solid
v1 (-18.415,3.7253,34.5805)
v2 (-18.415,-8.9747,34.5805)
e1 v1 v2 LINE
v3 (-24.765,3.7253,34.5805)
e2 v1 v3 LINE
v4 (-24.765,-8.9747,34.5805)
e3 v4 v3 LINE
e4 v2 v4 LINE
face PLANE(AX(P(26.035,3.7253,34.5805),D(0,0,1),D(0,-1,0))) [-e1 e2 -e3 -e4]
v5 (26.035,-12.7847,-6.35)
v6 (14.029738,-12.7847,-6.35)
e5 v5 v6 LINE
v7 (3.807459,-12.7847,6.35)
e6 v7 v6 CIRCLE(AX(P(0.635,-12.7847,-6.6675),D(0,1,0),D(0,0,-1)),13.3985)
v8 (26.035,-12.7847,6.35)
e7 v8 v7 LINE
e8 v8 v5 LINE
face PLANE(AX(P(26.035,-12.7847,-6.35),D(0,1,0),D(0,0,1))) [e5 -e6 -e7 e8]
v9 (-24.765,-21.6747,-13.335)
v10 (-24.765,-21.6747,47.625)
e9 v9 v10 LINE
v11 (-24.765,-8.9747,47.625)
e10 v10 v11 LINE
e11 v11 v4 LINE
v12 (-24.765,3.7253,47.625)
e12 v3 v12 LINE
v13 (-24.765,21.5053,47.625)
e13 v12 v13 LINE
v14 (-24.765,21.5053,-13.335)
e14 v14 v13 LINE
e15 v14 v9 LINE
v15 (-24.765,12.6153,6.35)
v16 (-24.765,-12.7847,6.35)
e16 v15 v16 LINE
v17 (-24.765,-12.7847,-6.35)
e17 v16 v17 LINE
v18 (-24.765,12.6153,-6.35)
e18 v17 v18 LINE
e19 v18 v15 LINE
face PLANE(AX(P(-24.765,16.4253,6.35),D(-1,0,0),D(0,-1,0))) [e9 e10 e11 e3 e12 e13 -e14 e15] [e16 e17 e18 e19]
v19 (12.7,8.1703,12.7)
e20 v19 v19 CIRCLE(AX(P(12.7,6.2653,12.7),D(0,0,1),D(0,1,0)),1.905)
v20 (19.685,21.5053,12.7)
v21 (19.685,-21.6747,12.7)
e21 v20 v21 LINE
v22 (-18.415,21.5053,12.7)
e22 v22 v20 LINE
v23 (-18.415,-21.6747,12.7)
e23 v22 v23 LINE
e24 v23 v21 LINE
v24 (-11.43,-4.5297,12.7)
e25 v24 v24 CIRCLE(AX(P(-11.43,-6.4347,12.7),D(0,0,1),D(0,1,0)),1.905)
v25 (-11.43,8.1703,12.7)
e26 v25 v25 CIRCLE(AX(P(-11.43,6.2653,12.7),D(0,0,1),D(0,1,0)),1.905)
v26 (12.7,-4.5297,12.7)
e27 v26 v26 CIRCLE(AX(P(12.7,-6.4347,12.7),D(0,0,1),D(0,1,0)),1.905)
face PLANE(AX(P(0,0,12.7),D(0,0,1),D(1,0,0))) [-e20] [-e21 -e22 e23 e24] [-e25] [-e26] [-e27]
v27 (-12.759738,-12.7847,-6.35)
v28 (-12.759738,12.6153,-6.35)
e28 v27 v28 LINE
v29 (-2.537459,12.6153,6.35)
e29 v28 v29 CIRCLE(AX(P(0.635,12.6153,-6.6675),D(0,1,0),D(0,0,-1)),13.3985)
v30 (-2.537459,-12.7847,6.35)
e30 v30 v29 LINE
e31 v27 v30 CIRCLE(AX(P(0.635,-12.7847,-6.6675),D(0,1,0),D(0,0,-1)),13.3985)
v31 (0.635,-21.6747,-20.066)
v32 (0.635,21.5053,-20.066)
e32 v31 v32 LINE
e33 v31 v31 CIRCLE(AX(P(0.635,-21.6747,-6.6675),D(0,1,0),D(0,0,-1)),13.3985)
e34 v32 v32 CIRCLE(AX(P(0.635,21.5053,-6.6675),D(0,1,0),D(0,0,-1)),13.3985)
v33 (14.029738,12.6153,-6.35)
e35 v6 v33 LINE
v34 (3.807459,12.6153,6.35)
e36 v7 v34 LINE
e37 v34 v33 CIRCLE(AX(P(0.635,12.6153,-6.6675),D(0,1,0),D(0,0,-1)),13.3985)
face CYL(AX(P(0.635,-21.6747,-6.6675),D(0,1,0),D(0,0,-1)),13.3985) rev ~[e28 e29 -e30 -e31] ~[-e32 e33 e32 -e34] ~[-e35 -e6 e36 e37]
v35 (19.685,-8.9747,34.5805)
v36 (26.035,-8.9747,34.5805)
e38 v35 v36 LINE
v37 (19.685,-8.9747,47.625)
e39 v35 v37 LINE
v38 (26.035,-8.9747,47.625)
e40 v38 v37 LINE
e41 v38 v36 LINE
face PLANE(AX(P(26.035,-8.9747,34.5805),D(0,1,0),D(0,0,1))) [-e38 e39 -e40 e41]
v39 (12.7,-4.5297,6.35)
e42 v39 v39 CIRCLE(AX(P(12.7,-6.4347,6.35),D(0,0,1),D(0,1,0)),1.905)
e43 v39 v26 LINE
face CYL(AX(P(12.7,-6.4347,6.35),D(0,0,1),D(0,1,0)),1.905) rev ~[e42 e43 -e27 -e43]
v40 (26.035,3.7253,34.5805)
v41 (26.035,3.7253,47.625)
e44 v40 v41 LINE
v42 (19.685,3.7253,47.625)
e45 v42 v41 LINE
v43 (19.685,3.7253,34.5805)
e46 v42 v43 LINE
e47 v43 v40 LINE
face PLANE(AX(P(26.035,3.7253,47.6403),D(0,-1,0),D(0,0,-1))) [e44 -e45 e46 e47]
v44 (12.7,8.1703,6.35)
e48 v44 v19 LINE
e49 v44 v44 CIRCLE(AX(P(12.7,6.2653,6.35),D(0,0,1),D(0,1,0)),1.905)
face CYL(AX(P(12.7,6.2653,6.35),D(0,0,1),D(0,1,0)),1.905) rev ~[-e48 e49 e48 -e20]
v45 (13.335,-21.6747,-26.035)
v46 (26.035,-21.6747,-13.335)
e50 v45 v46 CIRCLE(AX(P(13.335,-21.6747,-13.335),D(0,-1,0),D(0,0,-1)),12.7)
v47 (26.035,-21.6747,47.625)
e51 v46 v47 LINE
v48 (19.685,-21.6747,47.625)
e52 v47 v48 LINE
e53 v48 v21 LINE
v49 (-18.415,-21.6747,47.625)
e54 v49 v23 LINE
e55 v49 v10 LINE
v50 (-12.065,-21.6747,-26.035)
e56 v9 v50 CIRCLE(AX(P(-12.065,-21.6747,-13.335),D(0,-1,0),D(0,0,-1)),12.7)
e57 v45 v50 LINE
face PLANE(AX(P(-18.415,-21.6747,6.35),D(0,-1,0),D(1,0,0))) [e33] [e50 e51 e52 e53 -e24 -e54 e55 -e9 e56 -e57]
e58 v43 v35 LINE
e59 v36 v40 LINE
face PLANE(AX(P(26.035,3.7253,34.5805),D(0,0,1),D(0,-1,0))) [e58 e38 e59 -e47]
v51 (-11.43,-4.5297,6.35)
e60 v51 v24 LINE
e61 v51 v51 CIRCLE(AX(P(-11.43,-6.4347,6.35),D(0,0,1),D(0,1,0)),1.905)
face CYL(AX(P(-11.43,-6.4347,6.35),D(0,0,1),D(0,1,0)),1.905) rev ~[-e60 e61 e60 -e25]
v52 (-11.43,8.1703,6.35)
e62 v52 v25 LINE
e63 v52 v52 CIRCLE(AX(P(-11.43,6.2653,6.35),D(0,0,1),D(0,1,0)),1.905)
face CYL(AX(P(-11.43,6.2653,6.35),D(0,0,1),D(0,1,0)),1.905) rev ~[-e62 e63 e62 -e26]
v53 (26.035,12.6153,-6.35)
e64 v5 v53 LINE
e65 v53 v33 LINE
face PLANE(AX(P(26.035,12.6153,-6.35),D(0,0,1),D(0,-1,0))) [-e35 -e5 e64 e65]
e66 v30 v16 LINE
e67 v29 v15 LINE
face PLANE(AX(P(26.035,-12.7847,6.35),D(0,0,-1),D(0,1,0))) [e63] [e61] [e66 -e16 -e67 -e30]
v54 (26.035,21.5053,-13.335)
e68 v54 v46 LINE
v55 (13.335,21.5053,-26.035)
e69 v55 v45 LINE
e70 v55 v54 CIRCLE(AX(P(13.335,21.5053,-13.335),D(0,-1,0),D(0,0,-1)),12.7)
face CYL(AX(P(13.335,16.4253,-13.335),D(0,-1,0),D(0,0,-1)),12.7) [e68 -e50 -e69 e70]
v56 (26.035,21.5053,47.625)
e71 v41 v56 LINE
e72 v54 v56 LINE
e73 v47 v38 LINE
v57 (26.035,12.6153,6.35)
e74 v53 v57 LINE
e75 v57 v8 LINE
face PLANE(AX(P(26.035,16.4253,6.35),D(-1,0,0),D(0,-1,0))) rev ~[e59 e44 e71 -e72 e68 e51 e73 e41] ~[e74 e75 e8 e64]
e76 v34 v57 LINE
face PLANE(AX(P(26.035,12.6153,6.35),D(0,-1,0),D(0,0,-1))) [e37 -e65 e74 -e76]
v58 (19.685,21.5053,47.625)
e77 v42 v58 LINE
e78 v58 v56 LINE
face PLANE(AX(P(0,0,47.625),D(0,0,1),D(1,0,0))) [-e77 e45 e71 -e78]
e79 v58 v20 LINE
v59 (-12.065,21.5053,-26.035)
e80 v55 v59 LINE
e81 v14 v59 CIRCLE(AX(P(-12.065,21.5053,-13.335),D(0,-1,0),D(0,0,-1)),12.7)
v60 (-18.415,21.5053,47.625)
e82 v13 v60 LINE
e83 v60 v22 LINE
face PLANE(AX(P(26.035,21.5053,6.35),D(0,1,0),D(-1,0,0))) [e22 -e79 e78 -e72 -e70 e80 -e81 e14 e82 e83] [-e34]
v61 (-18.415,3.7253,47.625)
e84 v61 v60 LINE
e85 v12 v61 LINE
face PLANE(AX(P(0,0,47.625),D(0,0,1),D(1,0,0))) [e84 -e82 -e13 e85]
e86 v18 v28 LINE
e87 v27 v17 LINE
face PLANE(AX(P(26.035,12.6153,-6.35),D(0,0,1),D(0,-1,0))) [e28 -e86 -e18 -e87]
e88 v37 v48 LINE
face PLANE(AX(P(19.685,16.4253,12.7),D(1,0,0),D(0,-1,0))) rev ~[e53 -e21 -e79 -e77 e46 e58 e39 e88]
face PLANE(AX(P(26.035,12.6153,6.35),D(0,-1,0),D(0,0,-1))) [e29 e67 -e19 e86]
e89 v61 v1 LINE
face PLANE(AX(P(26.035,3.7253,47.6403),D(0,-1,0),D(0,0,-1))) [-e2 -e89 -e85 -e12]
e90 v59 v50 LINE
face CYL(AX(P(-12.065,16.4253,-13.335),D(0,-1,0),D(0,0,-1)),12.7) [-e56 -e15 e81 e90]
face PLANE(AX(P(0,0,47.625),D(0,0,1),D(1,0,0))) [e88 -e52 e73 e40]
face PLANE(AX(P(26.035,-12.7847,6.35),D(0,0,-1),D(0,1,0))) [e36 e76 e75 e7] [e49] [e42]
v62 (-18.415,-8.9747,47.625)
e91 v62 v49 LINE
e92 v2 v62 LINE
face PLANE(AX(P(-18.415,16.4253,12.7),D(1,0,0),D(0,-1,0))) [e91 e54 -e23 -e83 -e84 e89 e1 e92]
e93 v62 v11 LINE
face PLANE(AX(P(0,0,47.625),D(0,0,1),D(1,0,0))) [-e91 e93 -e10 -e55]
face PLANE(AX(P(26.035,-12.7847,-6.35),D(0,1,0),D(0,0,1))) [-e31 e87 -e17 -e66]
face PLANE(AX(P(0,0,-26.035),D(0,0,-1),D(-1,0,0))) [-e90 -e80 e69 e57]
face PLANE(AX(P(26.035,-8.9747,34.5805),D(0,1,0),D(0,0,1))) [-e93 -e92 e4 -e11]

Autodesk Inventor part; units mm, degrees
ref_plane "YZ Plane" through (0, 0, 0) normal (1, 0, 0) x (0, 1, 0)
ref_plane "XZ Plane" through (0, 0, 0) normal (0, 1, 0) x (-1, 0, 0)
ref_plane "XY Plane" through (0, 0, 0) normal (0, 0, 1) x (1, 0, 0)
sketch "Sketch1" plane through (0, 0, 0) normal (0, 0, 1) x (1, 0, 0)
  line L0 (-15.24, 10.0753) -> (16.51, 10.0753)
  line L1 (16.51, 10.0753) -> (16.51, -15.3247)
  line L2 (16.51, -15.3247) -> (-15.24, -15.3247)
  line L3 (-15.24, -15.3247) -> (-15.24, 10.0753)
  circle A0 centre (-11.43, 6.2653) radius 1.905
  circle A1 centre (-11.43, -6.4347) radius 1.905
  circle A2 centre (12.7, 6.2653) radius 1.905
  circle A3 centre (12.7, -6.4347) radius 1.905
  point P0 (0, 0)
  dimension "d0" = 31.75
  dimension "d1" = 25.4
  dimension "d10" = 3.81
  dimension "d11" = 8.89
  dimension "d12" = 3.81
  dimension "d13" = 3.81
  dimension "d14" = 8.89
  dimension "d15" = 3.81
  dimension "d16" = 3.81
  dimension "d17" = 3.81
  dimension "d18" = 3.81
  dimension "d19" = 3.81
  dimension "d20" = 3.81
  dimension "d21" = 3.81
  dimension "d22" = 8.89
extrude "Extrusion1" add sketch "Sketch1" along normal blind 6.35
sketch "Sketch2" plane through (0, 0, 6.35) normal (0, 0, 1) x (1, 0, 0)
  line L0 (-24.765, 16.4253) -> (26.035, 16.4253)
  line L1 (26.035, 16.4253) -> (26.035, -21.6747)
  line L2 (26.035, -21.6747) -> (-24.765, -21.6747)
  line L3 (-24.765, -21.6747) -> (-24.765, 16.4253)
  line L4 (16.51, -15.3247) -> (16.51, 10.0753) projected
  line L5 (-15.24, 10.0753) -> (-15.24, -15.3247) projected
  line L6 (16.51, 10.0753) -> (-15.24, 10.0753) projected
  point P0 (0, 0)
  dimension "d25" = 50.8
  dimension "d26" = 38.1
  dimension "d27" = 9.525
  dimension "d29" = 9.525
  dimension "d30" = 6.35
extrude "Extrusion2" add sketch "Sketch2" along normal blind 6.35
sketch "Sketch3" plane through (0, 0, 6.35) normal (0, 0, -1) x (-1, 0, 0)
  line L0 (24.765, -21.6747) -> (24.765, 16.4253) projected
  circle A0 centre (11.43, 6.2653) radius 1.905 projected
  line L1 (24.765, 16.4253) -> (-26.035, 16.4253) projected
  circle A1 centre (11.43, -6.4347) radius 1.905 projected
  line L2 (-26.035, -21.6747) -> (24.765, -21.6747) projected
  line L3 (-26.035, 16.4253) -> (-26.035, -21.6747) projected
  point P0 (0, 0)
  point P1 (-12.7, -6.4347)
  point P2 (-12.7, 6.2653)
  dimension "d33" = 13.335
  dimension "d34" = 10.16
  dimension "d35" = 13.335
  dimension "d36" = 15.24
  dimension "d37" = 13.335
  dimension "d38" = 10.16
  dimension "d39" = 15.24
  dimension "d40" = 13.335
hole "Hole1" at (-11.43, 6.2653, 6.35) at (-11.43, -6.4347, 6.35) at (12.7, -6.4347, 6.35) at (12.7, 6.2653, 6.35) direction (0, 0, 1) diameter 3.81 end through all
sketch "Sketch4" plane through (0, 0, 12.7) normal (0, 0, 1) x (1, 0, 0)
  line L0 (26.035, 16.4253) -> (26.035, -21.6747) projected
  line L1 (26.035, 16.4253) -> (19.685, 16.4253)
  line L2 (19.685, 16.4253) -> (19.685, -21.6747)
  line L3 (19.685, -21.6747) -> (26.035, -21.6747)
  line L4 (26.035, -21.6747) -> (26.035, 16.4253)
  line L5 (-24.765, 16.4253) -> (26.035, 16.4253) projected
  line L6 (-24.765, 16.4253) -> (-18.415, 16.4253)
  line L7 (-18.415, 16.4253) -> (-18.415, -21.6747)
  line L8 (-18.415, -21.6747) -> (-24.765, -21.6747)
  line L9 (-24.765, -21.6747) -> (-24.765, 16.4253)
  point P0 (0, 0)
  dimension "d48" = 6.35
  dimension "d49" = 6.35
extrude "Extrusion3" add sketch "Sketch4" along normal blind 34.925
sketch "Sketch5" plane through (26.035, -21.6747, 6.35) normal (1, 0, 0) x (0, 0, -1)
  line L0 (-41.2903, 25.4) -> (-28.2305, 25.4)
  line L1 (-28.2305, 25.4) -> (-28.2305, 12.7)
  line L2 (-28.2305, 12.7) -> (-41.2903, 12.7)
  line L3 (-41.2903, 12.7) -> (-41.2903, 25.4)
  line L4 (0, 38.1) -> (-41.275, 38.1) projected
  point P0 (6.35, 21.6747)
  dimension "d52" = 12.7
  dimension "d53" = 12.7
extrude "Extrusion4" cut sketch "Sketch5" against normal through all
sketch "Sketch6" plane through (0, 0, 6.35) normal (0, 0, -1) x (-1, 0, 0)
  point P0 (0, 0)
sketch "Sketch7" plane through (0, 0, 6.35) normal (0, 0, -1) x (-1, 0, 0)
  line L0 (-26.035, 16.4253) -> (-26.035, -21.6747) projected
  line L1 (24.765, -21.6747) -> (18.415, -21.6747) projected
  line L2 (-26.035, 16.4253) -> (24.765, 16.4253)
  line L3 (24.765, 16.4253) -> (24.765, -21.6747)
  line L4 (24.765, -21.6747) -> (-26.035, -21.6747)
  line L5 (-26.035, -21.6747) -> (-26.035, 16.4253)
  point P0 (0, 0)
extrude "Extrusion5" add sketch "Sketch7" along normal blind 32.385
sketch "Sketch8" plane through (-18.415, -21.6747, 12.7) normal (0, -1, 0) x (1, 0, 0)
  line L0 (44.45, -38.735) -> (-6.35, -38.735) projected
  line L1 (44.45, 34.925) -> (44.45, -38.735) projected
  line L2 (0, 0) -> (38.1, 0) projected
  line L3 (-6.35, 34.925) -> (-6.35, -38.735) projected
  point P0 (18.415, -12.7)
  point P1 (19.05, -19.3675)
  dimension "d60" = 19.3675
  dimension "d61" = 25.4
  dimension "d62" = 19.3675
  dimension "d63" = 25.4
hole "Hole2" at (0.635, -21.6747, -6.6675) direction (0, 1, 0) diameter 26.797 end through all
fillet "Fillet3" radius 12.7 2 edges at (-24.765, -2.6247, -26.035) (26.035, -2.6247, -26.035)
sketch "Sketch9" plane through (0, 0, 12.7) normal (0, 0, 1) x (1, 0, 0)
  circle A0 centre (12.7, -6.4347) radius 1.905
  circle A1 centre (-11.43, -6.4347) radius 1.905
  circle A2 centre (-11.43, 6.2653) radius 1.905
  line L0 (-18.415, -21.6747) -> (19.685, -21.6747) projected
  line L1 (26.035, 3.7253) -> (26.035, -8.9747) projected
  circle A3 centre (12.7, 6.2653) radius 1.905 projected
  circle A4 centre (-11.43, -6.4347) radius 1.905 projected
  circle A5 centre (12.7, 6.2653) radius 1.905
  line L2 (19.685, 16.4253) -> (-18.415, 16.4253) projected
  point P0 (0, 0)
  dimension "d73" = 15.24
  dimension "d74" = 13.335
  dimension "d75" = 12.7
  dimension "d76" = 24.13
  dimension "d77" = 24.13
  dimension "d78" = 3.81
  dimension "d79" = 3.81
  dimension "d80" = 12.7
  dimension "d81" = 3.81
  dimension "d82" = 10.16
  dimension "d83" = 24.13
extrude "Extrusion6" cut sketch "Sketch9" against normal blind 19.05
sketch "Sketch10" plane through (26.035, 3.7253, 47.625) normal (1, 0, 0) x (0, 0, -1)
  line L0 (41.275, 8.89) -> (53.975, 8.89)
  line L1 (53.975, 8.89) -> (53.975, -16.51)
  line L2 (53.975, -16.51) -> (41.275, -16.51)
  line L3 (41.275, -16.51) -> (41.275, 8.89)
  line L4 (34.925, -25.4) -> (34.925, 12.7) projected
  line L5 (0, 12.7) -> (60.96, 12.7) projected
  point P0 (47.625, -3.7253)
  dimension "d86" = 12.7
  dimension "d87" = 25.4
  dimension "d88" = 6.35
  dimension "d91" = 3.81
extrude "Extrusion7" cut sketch "Sketch10" against normal through all
thicken "Thicken1" operation add thickness 5.08 both sides no extend neighbours yes toward (0, 1, 0) faces at (-22.6483, 16.4253, 15.6633)
sketch "Sketch11" plane through (-18.415, 21.5053, 12.7) normal (0, 1, 0) x (1, 0, 0)
  point P0 (18.415, 12.7)
sketch "Sketch12" plane through (-24.765, -21.6747, 47.625) normal (-1, 0, 0) x (0, 0, 1)
  line L0 (-60.96, 43.18) -> (0, 43.18) projected
  line L1 (0, 0) -> (-60.96, 0) projected
  point P0 (-47.625, 21.6747)
sketch "Sketch13" plane through (-18.415, 21.5053, 12.7) normal (0, 1, 0) x (1, 0, 0)
  line L0 (44.45, -34.925) -> (44.45, 26.035) projected
  line L1 (-6.35, 26.035) -> (-6.35, -34.925) projected
  point P0 (18.415, 12.7)
  dimension "d95" = 50.8
equation "\"d12\" = d13"
equation "\"d15\" = d10"
equation "\"d16\" = d10"
equation "\"d17\" = d10"
equation "\"d19\" = d13"
equation "\"d20\" = d13"
equation "\"d21\" = d20"
equation "\"d22\" = d14"
equation "\"d37\" = d33"
equation "\"d38\" = d34"
equation "\"d39\" = d36"
equation "\"d40\" = d35"
equation "\"d77\" = d76"
equation "\"d79\" = d78"
properties part number "Vertical Seeder Rod spacer"
